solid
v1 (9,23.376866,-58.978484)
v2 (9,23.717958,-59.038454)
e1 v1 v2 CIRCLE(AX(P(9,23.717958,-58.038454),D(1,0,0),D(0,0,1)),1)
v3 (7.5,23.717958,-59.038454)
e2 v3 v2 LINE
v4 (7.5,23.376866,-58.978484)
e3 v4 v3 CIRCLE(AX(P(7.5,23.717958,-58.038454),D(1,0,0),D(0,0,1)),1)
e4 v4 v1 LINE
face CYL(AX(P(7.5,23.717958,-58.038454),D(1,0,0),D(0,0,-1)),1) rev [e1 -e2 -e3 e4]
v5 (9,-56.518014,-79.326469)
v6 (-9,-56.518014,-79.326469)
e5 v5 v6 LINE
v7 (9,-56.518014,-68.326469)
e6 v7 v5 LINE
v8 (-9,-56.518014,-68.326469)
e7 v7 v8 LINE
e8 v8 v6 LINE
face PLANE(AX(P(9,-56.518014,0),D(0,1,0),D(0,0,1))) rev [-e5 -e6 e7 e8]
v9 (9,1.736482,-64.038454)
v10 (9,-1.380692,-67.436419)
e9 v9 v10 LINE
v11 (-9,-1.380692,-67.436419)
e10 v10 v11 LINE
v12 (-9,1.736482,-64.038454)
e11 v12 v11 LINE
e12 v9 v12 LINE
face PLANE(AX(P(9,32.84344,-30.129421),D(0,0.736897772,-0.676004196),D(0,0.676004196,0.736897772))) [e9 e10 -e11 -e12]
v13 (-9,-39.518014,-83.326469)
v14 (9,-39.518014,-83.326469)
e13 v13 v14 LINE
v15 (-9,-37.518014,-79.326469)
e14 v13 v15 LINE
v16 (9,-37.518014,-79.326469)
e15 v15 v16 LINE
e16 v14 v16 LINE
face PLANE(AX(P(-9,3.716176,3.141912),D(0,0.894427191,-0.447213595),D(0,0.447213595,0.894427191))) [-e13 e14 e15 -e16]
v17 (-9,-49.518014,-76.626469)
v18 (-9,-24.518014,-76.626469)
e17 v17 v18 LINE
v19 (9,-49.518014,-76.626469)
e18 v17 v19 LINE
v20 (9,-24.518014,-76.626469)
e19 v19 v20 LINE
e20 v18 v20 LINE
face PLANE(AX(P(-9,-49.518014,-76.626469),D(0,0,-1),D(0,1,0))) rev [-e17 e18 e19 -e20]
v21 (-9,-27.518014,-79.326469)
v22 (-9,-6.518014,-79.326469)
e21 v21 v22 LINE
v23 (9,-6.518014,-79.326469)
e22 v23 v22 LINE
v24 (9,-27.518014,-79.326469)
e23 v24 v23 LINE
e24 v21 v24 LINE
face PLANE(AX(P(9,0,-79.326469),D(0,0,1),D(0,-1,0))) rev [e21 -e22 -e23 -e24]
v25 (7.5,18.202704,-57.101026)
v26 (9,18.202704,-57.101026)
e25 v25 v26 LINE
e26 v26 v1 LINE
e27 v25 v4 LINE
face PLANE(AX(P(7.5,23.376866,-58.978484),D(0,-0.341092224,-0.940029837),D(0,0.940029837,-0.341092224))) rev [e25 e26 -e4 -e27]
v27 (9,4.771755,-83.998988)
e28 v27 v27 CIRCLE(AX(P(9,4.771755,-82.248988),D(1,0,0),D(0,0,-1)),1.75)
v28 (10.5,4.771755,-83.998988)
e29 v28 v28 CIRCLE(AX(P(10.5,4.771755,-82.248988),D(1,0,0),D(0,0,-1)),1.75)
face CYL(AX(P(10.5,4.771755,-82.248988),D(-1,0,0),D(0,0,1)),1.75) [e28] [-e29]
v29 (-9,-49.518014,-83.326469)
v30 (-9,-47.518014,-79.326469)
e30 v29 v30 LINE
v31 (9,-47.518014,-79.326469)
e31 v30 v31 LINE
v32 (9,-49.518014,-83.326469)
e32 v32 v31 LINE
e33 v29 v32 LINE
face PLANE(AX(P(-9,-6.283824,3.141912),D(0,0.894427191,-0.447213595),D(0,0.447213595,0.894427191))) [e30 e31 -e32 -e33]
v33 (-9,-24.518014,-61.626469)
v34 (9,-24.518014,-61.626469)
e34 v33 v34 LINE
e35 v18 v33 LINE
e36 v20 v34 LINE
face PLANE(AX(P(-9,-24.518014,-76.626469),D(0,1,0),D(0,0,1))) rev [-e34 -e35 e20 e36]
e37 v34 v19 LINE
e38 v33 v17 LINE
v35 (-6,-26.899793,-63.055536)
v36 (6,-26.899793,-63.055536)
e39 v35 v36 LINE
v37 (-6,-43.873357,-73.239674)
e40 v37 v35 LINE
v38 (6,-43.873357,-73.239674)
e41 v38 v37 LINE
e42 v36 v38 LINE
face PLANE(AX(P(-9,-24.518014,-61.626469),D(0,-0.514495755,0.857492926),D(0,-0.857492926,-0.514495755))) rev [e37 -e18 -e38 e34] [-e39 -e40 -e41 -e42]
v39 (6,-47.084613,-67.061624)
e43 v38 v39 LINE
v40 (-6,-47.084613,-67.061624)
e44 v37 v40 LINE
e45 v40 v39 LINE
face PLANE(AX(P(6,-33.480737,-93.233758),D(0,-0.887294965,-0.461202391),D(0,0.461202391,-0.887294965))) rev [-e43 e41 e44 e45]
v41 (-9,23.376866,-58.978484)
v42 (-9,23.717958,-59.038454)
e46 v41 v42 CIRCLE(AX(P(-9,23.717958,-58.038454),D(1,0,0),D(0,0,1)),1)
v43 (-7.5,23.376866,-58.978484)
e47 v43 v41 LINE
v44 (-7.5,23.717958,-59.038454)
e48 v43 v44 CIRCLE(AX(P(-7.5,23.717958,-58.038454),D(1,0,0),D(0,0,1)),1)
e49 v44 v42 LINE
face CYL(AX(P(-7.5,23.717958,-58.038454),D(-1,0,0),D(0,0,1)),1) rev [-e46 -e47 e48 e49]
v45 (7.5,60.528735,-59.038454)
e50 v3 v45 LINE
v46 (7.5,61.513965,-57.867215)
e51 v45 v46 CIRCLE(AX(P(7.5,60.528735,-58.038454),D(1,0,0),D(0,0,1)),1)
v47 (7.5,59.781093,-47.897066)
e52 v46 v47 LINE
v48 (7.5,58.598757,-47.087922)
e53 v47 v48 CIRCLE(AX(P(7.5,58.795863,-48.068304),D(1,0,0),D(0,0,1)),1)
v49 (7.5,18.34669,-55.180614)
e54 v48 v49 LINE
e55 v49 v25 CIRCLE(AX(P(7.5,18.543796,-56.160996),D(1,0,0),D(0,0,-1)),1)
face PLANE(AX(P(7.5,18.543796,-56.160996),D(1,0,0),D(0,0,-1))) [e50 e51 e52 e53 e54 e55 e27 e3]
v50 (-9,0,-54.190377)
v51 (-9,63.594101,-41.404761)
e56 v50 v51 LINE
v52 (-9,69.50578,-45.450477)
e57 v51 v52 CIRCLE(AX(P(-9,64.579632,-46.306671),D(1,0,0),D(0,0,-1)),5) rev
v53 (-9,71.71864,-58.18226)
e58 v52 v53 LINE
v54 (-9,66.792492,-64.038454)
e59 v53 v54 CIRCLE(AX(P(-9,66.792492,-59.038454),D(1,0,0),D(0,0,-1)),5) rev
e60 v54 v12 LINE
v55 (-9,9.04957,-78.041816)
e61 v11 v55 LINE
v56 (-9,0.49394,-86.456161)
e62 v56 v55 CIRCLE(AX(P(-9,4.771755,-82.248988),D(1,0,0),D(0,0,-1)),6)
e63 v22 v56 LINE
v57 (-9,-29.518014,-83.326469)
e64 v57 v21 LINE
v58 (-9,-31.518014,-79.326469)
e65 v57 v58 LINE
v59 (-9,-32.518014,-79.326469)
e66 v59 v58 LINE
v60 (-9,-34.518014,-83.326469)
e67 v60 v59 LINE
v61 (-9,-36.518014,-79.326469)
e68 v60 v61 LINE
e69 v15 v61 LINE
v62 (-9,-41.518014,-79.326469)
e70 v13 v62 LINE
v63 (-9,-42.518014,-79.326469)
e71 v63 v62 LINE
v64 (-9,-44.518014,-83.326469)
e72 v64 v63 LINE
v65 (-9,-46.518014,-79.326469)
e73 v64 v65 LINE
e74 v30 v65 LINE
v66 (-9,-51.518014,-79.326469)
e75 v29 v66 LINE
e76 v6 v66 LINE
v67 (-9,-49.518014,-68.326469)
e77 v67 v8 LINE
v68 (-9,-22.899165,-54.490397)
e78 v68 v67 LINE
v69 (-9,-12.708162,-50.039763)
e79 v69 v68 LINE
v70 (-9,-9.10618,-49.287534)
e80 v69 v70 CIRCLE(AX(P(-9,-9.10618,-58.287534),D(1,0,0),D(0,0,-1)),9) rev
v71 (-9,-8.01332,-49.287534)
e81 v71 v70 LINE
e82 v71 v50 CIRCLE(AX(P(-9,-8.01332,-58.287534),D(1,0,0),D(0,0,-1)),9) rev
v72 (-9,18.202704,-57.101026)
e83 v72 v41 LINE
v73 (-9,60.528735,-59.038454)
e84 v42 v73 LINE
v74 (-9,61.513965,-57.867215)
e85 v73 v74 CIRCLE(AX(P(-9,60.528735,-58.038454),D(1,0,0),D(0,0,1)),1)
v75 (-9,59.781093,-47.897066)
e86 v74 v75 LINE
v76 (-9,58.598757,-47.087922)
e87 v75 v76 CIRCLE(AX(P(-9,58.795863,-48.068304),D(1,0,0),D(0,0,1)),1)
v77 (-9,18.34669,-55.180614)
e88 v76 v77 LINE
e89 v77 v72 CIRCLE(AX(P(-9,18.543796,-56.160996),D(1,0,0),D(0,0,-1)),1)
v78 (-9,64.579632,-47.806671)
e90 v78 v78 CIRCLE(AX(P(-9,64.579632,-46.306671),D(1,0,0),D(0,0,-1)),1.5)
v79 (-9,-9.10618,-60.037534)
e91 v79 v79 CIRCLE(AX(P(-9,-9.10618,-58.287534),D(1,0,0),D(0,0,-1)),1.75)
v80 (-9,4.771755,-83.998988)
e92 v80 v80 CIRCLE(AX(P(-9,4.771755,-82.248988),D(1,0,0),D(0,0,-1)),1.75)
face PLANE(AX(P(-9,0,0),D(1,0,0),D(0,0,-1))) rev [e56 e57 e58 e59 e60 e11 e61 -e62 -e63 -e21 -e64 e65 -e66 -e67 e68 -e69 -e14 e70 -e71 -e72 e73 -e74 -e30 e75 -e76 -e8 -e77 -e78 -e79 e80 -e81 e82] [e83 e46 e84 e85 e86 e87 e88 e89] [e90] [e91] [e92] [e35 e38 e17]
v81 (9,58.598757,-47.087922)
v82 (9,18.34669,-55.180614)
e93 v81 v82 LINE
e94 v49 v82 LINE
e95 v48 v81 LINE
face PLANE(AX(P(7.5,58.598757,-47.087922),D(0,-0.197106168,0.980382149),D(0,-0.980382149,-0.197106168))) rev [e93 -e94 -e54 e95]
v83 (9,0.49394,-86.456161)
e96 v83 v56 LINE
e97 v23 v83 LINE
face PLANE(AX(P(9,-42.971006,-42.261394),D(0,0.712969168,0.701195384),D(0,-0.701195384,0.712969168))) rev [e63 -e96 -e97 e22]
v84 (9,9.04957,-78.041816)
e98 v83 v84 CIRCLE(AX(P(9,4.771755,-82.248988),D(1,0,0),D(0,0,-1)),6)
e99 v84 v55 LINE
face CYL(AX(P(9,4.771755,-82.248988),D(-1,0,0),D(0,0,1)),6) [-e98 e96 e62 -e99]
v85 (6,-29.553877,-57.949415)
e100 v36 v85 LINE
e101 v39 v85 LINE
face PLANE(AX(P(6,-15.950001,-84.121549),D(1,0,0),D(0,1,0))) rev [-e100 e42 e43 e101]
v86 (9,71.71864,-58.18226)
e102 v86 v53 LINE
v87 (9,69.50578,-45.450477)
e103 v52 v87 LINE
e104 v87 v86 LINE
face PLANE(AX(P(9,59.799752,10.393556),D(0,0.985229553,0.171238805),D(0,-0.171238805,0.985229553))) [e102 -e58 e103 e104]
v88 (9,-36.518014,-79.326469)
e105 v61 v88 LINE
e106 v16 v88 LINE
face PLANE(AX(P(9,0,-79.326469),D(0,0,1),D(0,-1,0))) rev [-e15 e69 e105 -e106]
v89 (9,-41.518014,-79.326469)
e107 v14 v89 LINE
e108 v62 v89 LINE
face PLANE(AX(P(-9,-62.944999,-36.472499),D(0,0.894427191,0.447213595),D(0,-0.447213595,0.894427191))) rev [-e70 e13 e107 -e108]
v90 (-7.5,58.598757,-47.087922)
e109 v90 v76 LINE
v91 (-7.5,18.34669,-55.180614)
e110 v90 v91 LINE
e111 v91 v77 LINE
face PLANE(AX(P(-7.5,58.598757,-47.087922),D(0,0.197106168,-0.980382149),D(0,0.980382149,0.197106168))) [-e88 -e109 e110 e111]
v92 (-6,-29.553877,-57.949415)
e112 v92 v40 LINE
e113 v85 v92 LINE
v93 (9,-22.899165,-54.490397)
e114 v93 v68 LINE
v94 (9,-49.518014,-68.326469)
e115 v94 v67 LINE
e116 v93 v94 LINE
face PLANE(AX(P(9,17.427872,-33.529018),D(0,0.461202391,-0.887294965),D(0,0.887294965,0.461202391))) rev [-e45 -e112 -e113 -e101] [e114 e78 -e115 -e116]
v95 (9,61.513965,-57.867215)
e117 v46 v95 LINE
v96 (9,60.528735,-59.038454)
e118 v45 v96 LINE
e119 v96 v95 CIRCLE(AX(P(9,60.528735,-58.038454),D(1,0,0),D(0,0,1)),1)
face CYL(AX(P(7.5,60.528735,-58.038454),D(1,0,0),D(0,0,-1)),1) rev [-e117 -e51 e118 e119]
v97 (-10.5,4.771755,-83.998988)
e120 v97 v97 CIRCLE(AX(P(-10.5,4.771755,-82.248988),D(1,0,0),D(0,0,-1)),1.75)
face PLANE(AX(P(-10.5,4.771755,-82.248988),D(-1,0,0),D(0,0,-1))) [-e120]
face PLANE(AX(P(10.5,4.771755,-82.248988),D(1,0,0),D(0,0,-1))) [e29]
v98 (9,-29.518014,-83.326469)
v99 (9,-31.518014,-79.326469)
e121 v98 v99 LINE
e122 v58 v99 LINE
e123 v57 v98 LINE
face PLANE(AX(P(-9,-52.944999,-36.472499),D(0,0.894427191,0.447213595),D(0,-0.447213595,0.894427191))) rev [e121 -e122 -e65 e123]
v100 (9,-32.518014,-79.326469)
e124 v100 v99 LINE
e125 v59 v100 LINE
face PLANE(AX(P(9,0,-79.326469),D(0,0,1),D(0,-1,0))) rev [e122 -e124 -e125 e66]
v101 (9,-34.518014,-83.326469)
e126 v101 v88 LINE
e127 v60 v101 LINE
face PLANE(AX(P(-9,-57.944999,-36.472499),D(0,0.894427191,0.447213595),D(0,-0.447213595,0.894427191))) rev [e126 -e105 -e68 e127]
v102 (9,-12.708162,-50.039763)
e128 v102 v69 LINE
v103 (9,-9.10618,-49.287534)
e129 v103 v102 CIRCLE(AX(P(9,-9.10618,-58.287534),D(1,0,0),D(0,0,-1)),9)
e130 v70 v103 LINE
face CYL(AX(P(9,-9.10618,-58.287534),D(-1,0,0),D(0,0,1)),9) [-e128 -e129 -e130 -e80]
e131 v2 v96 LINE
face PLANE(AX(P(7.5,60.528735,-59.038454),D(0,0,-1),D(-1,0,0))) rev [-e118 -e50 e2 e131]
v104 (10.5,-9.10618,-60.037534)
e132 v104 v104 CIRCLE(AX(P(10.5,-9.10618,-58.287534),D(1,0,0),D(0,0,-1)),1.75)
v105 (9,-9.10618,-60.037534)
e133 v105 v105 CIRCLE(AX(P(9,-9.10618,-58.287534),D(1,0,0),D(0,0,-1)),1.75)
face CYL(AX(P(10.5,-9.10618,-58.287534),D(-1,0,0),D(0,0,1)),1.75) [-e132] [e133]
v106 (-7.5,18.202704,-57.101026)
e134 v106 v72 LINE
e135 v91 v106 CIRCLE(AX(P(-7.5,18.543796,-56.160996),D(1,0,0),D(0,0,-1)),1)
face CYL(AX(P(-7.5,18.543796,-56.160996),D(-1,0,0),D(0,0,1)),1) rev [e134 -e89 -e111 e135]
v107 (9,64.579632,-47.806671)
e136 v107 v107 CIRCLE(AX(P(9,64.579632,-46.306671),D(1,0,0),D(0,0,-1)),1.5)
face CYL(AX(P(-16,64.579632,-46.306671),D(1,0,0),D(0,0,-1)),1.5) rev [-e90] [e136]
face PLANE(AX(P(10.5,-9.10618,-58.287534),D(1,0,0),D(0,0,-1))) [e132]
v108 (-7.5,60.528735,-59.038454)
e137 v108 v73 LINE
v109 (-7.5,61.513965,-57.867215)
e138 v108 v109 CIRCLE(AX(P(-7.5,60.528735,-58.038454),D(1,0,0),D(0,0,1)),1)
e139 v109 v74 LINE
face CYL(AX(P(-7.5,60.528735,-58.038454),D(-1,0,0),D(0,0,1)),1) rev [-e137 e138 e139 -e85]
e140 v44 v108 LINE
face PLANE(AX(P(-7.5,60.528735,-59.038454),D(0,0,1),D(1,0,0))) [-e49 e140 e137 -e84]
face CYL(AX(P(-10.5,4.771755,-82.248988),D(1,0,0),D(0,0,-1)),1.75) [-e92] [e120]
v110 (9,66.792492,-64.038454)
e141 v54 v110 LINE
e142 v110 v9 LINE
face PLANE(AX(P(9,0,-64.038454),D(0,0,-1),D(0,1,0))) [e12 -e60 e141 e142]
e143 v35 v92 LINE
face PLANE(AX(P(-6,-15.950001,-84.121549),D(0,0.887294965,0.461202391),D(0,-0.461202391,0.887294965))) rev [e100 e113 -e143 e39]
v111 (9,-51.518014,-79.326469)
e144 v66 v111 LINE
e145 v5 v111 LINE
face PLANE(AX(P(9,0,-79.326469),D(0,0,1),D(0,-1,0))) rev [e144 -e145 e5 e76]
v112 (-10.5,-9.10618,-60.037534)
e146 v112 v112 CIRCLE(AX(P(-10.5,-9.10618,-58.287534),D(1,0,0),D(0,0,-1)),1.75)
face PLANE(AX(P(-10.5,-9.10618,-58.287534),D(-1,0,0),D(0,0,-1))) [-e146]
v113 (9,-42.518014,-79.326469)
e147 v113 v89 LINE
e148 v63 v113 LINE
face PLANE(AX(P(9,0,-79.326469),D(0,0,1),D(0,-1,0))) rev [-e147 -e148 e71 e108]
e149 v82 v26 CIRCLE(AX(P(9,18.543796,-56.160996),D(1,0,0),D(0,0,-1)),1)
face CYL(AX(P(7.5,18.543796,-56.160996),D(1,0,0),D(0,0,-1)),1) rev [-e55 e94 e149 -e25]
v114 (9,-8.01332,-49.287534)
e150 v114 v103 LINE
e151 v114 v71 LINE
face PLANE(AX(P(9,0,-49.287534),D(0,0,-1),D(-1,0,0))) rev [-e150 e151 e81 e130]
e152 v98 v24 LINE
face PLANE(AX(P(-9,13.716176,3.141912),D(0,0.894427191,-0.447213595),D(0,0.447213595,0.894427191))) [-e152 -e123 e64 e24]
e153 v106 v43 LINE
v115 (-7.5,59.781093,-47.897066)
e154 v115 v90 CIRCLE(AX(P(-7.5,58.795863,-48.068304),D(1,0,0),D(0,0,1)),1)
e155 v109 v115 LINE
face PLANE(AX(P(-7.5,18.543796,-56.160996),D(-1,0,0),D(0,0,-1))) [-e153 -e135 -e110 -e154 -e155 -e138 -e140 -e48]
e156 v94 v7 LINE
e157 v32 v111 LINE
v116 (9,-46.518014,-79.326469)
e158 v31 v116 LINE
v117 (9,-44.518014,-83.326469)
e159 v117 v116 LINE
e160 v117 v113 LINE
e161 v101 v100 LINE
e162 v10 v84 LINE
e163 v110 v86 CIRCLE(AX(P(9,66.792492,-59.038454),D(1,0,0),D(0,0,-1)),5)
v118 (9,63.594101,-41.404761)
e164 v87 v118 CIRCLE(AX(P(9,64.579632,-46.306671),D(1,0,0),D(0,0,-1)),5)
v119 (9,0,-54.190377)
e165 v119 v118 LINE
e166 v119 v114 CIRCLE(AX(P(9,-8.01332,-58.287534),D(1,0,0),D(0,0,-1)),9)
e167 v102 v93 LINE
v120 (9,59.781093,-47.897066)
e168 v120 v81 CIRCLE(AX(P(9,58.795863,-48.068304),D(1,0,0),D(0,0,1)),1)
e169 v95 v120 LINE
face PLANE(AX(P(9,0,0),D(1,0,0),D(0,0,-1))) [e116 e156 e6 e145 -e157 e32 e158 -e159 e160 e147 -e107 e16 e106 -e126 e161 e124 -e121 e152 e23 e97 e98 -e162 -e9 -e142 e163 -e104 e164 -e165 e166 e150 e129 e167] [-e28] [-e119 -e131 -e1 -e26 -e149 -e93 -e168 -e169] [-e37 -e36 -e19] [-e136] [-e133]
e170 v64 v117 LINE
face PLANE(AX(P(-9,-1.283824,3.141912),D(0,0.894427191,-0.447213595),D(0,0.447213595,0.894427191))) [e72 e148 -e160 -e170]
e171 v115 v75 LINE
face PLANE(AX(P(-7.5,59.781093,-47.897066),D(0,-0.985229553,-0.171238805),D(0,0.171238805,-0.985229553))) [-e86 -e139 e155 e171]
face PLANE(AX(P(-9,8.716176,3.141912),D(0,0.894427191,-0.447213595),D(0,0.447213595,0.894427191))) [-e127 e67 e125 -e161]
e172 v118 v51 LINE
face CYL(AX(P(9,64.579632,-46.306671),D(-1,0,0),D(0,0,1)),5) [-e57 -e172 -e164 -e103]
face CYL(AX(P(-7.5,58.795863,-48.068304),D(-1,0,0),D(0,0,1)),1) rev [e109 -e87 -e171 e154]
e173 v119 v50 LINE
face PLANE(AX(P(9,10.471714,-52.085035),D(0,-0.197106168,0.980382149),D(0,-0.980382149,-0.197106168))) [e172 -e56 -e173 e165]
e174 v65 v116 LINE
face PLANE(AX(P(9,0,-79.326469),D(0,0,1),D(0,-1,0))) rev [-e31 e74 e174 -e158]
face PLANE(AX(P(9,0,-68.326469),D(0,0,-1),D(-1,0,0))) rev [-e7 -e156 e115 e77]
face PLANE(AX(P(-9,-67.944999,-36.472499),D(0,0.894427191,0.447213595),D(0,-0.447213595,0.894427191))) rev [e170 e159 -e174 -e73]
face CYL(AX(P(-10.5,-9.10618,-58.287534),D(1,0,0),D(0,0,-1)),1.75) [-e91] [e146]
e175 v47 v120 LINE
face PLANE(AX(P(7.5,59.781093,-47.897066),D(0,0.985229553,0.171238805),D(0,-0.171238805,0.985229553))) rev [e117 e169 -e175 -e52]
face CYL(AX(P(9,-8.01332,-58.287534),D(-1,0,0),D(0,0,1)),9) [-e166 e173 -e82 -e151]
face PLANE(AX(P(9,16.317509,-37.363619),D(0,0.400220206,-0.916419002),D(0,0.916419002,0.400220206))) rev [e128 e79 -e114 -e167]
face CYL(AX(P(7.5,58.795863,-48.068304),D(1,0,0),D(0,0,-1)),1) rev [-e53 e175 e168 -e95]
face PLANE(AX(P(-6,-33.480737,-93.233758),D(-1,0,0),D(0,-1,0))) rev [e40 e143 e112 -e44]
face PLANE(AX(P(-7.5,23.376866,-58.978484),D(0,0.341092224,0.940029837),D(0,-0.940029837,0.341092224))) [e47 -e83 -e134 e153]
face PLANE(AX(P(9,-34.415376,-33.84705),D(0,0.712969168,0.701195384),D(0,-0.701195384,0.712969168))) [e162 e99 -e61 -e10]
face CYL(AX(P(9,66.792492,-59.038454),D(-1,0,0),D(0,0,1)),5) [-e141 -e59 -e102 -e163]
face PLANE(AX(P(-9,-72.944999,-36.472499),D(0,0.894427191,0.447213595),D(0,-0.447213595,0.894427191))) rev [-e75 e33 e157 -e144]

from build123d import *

# Parameters (mm, degrees)
BOSS_EXTRUDE1_DEPTH     = 9
CUT_EXTRUDE1_DEPTH      = 116.769079262
CUT_EXTRUDE1_DEPTH_BACK = 116.769079262
BOSS_EXTRUDE2_DEPTH     = 18
LPATTERN1_COUNT         = 5
LPATTERN1_PITCH         = 5
FILLET1_R               = 9
FILLET2_R               = 5
SKETCH5_R               = 1.5
CUT_EXTRUDE2_DEPTH      = 25
CUT_EXTRUDE3_REACH      = 94.43
SKETCH8_W               = 12
SKETCH8_H               = 19.757506074
SKETCH9_R               = 1.75
BOSS_EXTRUDE3_DEPTH     = 1.5
SKETCH10_R              = 1.75
BOSS_EXTRUDE4_DEPTH     = 1.5
CUT_EXTRUDE5_DEPTH      = 1.5


with BuildPart() as part:
    # Sketch1 → Boss-Extrude1 (new, symmetric)
    with BuildSketch(Plane(origin=(0, 0, 0), x_dir=(0, 0, -1), z_dir=(1, 0, 0))):
        Polygon((64.03845405, 1.736481777), (54.19037652, 0), (40.392944784, 68.626750451), (64.03845405, 72.736481777), align=None)
        with BuildLine():
            Line((79.326468903, -6.518014035), (86.456160579, 0.493939802))
            ThreePointArc((86.456160579, 0.493939802), (86.526803283, 8.978927109), (78.041815975, 9.049569813))
            Line((78.041815975, 9.049569813), (67.436419126, -1.380692322))
            Line((67.436419126, -1.380692322), (64.03845405, 1.736481777))
            Line((64.03845405, 1.736481777), (54.19037652, 0))
            Line((54.19037652, 0), (49.287534486, -0.985718074))
            Line((49.287534486, -0.985718074), (49.287534486, -10.985718074))
            Line((49.287534486, -10.985718074), (54.49039716, -22.899165098))
            Line((54.49039716, -22.899165098), (68.326468903, -49.518014035))
            Line((68.326468903, -49.518014035), (68.326468903, -56.518014035))
            Line((68.326468903, -56.518014035), (79.326468903, -56.518014035))
            Line((79.326468903, -56.518014035), (79.326468903, -6.518014035))
        make_face()
    extrude(amount=BOSS_EXTRUDE1_DEPTH, both=True)

    # Sketch3 → Cut-Extrude1 (cut, two sides: drawn at the far end of the back side and taken through both)
    with BuildSketch(Plane(origin=(9, 0, 0), x_dir=(0, 0, -1), z_dir=(1, 0, 0)).offset(-CUT_EXTRUDE1_DEPTH_BACK)):
        Polygon((76.626468903, -49.518014035), (76.626468903, -24.518014035), (61.626468903, -24.518014035), align=None)
    extrude(amount=CUT_EXTRUDE1_DEPTH + CUT_EXTRUDE1_DEPTH_BACK, mode=Mode.SUBTRACT)

    # Sketch4 → Boss-Extrude2 (add)
    with BuildSketch(Plane(origin=(9, 0, 0), x_dir=(0, 0, -1), z_dir=(1, 0, 0))):
        Polygon((83.326468903, -49.518014035), (79.326468903, -49.518014035), (79.326468903, -51.518014035), align=None)
        Polygon((79.326468903, -47.518014035), (79.326468903, -49.518014035), (83.326468903, -49.518014035), align=None)
    boss_extrude2 = extrude(amount=-BOSS_EXTRUDE2_DEPTH)

    # LPattern1: Boss-Extrude2 ×5
    with Locations(*[(0, i * LPATTERN1_PITCH, 0) for i in range(1, LPATTERN1_COUNT)]):
        add(boss_extrude2)

    # Fillet1
    # the kernel refuses this fillet: 9 mm, written as the material it takes off along each edge
    with BuildSketch(Plane(origin=(-13.698844365, -10.985718074, -49.287534486), x_dir=(0, -0.9164190018423571, -0.4002202057146263), z_dir=(1, 0, 0))) as fillet1_piece_1:
        with BuildLine():
            CenterArc((FILLET1_R * 0.208837527352, FILLET1_R), FILLET1_R, 246.408054679, 23.591945321)
            Line((-FILLET1_R * 0.191382678363, FILLET1_R * 0.0835809981576), (-FILLET1_R * 0.199387082477, FILLET1_R * 0.0652526181208))
            Line((-FILLET1_R * 0.199387082477, FILLET1_R * 0.0652526181208), (-FILLET1_R * 0.00417675054703, -FILLET1_R * 0.02))
            Line((-FILLET1_R * 0.00417675054703, -FILLET1_R * 0.02), (FILLET1_R * 0.208837527352, -FILLET1_R * 0.02))
            Line((FILLET1_R * 0.208837527352, -FILLET1_R * 0.02), (FILLET1_R * 0.208837527352, 0))
        make_face()
    extrude(amount=27.397688731, mode=Mode.SUBTRACT)
    with BuildSketch(Plane(origin=(-26.569004687, -0.985718074, -49.287534486), x_dir=(0, -1, 0), z_dir=(1, 0, 0))) as fillet1_piece_2:
        with BuildLine():
            CenterArc((7.027601875, 9), FILLET1_R, 207.080362773, 62.919637227)
            Line((-0.985718074, 4.902842034), (-1.145984473, 4.820898874))
            ThreePointArc((-1.145984473, 4.820898874), (-0.669327824, 2.415941907), (-0.176468787, -0.03547911))
            Line((-0.176468787, -0.03547911), (0, -0.18))
            Line((0, -0.18), (7.027601875, -0.18))
            Line((7.027601875, -0.18), (7.027601875, 0))
        make_face()
    extrude(amount=53.138009374, mode=Mode.SUBTRACT)

    # Fillet2
    fillet2_edges = [part.edges().sort_by_distance(p)[0] for p in [
        (0, 68.626750451, -40.392944784),
        (0, 72.736481777, -64.03845405),
    ]]
    fillet(fillet2_edges, radius=FILLET2_R)

    # Sketch5 → Cut-Extrude2 (cut)
    with BuildSketch(Plane(origin=(9, 0, 0), x_dir=(0, 0, -1), z_dir=(1, 0, 0))):
        with Locations((46.306671362, 64.579632178)):
            Circle(SKETCH5_R)
    extrude(amount=-CUT_EXTRUDE2_DEPTH, mode=Mode.SUBTRACT)

    # Cut-Extrude3: up to this plane
    cut_extrude3_end = Plane(origin=(-9, -24.518014035, -61.626468903), z_dir=(0, -0.5144957554275262, 0.8574929257125444))
    # Sketch8 → Cut-Extrude3 (cut, up to the surface)
    with BuildSketch(Plane(origin=(0, 17.427872297, -33.529018106), x_dir=(1, 0, 0), z_dir=(0, -0.4612023914177088, 0.8872949645696107)), mode=Mode.PRIVATE) as cut_extrude3_sk1:
        with Locations((0, -62.828168401)):
            Rectangle(SKETCH8_W, SKETCH8_H)
    cut_extrude3_tool1 = split(extrude(cut_extrude3_sk1.sketch, amount=-CUT_EXTRUDE3_REACH, mode=Mode.PRIVATE), bisect_by=cut_extrude3_end, keep=Keep.BOTH, mode=Mode.PRIVATE)
    add(cut_extrude3_tool1.solids().sort_by_distance((0, -38.319245, -62.50552))[0], mode=Mode.SUBTRACT)

    # Sketch9 → Boss-Extrude3 (add)
    with BuildSketch(Plane(origin=(9, 0, 0), x_dir=(0, 0, -1), z_dir=(1, 0, 0))):
        with Locations((82.248988277, 4.771754807)):
            Circle(SKETCH9_R)
    boss_extrude3 = extrude(amount=BOSS_EXTRUDE3_DEPTH)

    # Sketch10 → Boss-Extrude4 (add)
    with BuildSketch(Plane(origin=(9, 0, 0), x_dir=(0, 0, -1), z_dir=(1, 0, 0))):
        with Locations((58.287534486, -9.106180328)):
            Circle(SKETCH10_R)
    boss_extrude4 = extrude(amount=BOSS_EXTRUDE4_DEPTH)

    # Sketch11 → Cut-Extrude5 (cut)
    with BuildSketch(Plane(origin=(9, 0, 0), x_dir=(0, 0, -1), z_dir=(1, 0, 0))):
        with BuildLine():
            Line((59.03845405, 60.528735066), (59.03845405, 23.717958421))
            ThreePointArc((59.03845405, 23.717958421), (59.023347404, 23.544796412), (58.978483887, 23.376866197))
            Line((58.978483887, 23.376866197), (57.101026027, 18.202704248))
            ThreePointArc((57.101026027, 18.202704248), (56.086229397, 17.546595426), (55.180614041, 18.346690305))
            Line((55.180614041, 18.346690305), (47.087922198, 58.598757084))
            ThreePointArc((47.087922198, 58.598757084), (47.2430546, 59.360631218), (47.897065542, 59.781092804))
            Line((47.897065542, 59.781092804), (57.867215244, 61.513964619))
            ThreePointArc((57.867215244, 61.513964619), (58.682178057, 61.293992802), (59.03845405, 60.528735066))
        make_face()
    cut_extrude5 = extrude(amount=-CUT_EXTRUDE5_DEPTH, mode=Mode.SUBTRACT)

    # Mirror1: Cut-Extrude5 across plane
    add(cut_extrude5.mirror(Plane(origin=(0, 0, 0), x_dir=(0, 0, 1), z_dir=(1, 0, 0))), mode=Mode.SUBTRACT)

    # Mirror2: Boss-Extrude3, Boss-Extrude4 across plane
    add(boss_extrude3.mirror(Plane(origin=(0, 0, 0), x_dir=(0, 0, 1), z_dir=(1, 0, 0))))
    add(boss_extrude4.mirror(Plane(origin=(0, 0, 0), x_dir=(0, 0, 1), z_dir=(1, 0, 0))))


solid = part.part
